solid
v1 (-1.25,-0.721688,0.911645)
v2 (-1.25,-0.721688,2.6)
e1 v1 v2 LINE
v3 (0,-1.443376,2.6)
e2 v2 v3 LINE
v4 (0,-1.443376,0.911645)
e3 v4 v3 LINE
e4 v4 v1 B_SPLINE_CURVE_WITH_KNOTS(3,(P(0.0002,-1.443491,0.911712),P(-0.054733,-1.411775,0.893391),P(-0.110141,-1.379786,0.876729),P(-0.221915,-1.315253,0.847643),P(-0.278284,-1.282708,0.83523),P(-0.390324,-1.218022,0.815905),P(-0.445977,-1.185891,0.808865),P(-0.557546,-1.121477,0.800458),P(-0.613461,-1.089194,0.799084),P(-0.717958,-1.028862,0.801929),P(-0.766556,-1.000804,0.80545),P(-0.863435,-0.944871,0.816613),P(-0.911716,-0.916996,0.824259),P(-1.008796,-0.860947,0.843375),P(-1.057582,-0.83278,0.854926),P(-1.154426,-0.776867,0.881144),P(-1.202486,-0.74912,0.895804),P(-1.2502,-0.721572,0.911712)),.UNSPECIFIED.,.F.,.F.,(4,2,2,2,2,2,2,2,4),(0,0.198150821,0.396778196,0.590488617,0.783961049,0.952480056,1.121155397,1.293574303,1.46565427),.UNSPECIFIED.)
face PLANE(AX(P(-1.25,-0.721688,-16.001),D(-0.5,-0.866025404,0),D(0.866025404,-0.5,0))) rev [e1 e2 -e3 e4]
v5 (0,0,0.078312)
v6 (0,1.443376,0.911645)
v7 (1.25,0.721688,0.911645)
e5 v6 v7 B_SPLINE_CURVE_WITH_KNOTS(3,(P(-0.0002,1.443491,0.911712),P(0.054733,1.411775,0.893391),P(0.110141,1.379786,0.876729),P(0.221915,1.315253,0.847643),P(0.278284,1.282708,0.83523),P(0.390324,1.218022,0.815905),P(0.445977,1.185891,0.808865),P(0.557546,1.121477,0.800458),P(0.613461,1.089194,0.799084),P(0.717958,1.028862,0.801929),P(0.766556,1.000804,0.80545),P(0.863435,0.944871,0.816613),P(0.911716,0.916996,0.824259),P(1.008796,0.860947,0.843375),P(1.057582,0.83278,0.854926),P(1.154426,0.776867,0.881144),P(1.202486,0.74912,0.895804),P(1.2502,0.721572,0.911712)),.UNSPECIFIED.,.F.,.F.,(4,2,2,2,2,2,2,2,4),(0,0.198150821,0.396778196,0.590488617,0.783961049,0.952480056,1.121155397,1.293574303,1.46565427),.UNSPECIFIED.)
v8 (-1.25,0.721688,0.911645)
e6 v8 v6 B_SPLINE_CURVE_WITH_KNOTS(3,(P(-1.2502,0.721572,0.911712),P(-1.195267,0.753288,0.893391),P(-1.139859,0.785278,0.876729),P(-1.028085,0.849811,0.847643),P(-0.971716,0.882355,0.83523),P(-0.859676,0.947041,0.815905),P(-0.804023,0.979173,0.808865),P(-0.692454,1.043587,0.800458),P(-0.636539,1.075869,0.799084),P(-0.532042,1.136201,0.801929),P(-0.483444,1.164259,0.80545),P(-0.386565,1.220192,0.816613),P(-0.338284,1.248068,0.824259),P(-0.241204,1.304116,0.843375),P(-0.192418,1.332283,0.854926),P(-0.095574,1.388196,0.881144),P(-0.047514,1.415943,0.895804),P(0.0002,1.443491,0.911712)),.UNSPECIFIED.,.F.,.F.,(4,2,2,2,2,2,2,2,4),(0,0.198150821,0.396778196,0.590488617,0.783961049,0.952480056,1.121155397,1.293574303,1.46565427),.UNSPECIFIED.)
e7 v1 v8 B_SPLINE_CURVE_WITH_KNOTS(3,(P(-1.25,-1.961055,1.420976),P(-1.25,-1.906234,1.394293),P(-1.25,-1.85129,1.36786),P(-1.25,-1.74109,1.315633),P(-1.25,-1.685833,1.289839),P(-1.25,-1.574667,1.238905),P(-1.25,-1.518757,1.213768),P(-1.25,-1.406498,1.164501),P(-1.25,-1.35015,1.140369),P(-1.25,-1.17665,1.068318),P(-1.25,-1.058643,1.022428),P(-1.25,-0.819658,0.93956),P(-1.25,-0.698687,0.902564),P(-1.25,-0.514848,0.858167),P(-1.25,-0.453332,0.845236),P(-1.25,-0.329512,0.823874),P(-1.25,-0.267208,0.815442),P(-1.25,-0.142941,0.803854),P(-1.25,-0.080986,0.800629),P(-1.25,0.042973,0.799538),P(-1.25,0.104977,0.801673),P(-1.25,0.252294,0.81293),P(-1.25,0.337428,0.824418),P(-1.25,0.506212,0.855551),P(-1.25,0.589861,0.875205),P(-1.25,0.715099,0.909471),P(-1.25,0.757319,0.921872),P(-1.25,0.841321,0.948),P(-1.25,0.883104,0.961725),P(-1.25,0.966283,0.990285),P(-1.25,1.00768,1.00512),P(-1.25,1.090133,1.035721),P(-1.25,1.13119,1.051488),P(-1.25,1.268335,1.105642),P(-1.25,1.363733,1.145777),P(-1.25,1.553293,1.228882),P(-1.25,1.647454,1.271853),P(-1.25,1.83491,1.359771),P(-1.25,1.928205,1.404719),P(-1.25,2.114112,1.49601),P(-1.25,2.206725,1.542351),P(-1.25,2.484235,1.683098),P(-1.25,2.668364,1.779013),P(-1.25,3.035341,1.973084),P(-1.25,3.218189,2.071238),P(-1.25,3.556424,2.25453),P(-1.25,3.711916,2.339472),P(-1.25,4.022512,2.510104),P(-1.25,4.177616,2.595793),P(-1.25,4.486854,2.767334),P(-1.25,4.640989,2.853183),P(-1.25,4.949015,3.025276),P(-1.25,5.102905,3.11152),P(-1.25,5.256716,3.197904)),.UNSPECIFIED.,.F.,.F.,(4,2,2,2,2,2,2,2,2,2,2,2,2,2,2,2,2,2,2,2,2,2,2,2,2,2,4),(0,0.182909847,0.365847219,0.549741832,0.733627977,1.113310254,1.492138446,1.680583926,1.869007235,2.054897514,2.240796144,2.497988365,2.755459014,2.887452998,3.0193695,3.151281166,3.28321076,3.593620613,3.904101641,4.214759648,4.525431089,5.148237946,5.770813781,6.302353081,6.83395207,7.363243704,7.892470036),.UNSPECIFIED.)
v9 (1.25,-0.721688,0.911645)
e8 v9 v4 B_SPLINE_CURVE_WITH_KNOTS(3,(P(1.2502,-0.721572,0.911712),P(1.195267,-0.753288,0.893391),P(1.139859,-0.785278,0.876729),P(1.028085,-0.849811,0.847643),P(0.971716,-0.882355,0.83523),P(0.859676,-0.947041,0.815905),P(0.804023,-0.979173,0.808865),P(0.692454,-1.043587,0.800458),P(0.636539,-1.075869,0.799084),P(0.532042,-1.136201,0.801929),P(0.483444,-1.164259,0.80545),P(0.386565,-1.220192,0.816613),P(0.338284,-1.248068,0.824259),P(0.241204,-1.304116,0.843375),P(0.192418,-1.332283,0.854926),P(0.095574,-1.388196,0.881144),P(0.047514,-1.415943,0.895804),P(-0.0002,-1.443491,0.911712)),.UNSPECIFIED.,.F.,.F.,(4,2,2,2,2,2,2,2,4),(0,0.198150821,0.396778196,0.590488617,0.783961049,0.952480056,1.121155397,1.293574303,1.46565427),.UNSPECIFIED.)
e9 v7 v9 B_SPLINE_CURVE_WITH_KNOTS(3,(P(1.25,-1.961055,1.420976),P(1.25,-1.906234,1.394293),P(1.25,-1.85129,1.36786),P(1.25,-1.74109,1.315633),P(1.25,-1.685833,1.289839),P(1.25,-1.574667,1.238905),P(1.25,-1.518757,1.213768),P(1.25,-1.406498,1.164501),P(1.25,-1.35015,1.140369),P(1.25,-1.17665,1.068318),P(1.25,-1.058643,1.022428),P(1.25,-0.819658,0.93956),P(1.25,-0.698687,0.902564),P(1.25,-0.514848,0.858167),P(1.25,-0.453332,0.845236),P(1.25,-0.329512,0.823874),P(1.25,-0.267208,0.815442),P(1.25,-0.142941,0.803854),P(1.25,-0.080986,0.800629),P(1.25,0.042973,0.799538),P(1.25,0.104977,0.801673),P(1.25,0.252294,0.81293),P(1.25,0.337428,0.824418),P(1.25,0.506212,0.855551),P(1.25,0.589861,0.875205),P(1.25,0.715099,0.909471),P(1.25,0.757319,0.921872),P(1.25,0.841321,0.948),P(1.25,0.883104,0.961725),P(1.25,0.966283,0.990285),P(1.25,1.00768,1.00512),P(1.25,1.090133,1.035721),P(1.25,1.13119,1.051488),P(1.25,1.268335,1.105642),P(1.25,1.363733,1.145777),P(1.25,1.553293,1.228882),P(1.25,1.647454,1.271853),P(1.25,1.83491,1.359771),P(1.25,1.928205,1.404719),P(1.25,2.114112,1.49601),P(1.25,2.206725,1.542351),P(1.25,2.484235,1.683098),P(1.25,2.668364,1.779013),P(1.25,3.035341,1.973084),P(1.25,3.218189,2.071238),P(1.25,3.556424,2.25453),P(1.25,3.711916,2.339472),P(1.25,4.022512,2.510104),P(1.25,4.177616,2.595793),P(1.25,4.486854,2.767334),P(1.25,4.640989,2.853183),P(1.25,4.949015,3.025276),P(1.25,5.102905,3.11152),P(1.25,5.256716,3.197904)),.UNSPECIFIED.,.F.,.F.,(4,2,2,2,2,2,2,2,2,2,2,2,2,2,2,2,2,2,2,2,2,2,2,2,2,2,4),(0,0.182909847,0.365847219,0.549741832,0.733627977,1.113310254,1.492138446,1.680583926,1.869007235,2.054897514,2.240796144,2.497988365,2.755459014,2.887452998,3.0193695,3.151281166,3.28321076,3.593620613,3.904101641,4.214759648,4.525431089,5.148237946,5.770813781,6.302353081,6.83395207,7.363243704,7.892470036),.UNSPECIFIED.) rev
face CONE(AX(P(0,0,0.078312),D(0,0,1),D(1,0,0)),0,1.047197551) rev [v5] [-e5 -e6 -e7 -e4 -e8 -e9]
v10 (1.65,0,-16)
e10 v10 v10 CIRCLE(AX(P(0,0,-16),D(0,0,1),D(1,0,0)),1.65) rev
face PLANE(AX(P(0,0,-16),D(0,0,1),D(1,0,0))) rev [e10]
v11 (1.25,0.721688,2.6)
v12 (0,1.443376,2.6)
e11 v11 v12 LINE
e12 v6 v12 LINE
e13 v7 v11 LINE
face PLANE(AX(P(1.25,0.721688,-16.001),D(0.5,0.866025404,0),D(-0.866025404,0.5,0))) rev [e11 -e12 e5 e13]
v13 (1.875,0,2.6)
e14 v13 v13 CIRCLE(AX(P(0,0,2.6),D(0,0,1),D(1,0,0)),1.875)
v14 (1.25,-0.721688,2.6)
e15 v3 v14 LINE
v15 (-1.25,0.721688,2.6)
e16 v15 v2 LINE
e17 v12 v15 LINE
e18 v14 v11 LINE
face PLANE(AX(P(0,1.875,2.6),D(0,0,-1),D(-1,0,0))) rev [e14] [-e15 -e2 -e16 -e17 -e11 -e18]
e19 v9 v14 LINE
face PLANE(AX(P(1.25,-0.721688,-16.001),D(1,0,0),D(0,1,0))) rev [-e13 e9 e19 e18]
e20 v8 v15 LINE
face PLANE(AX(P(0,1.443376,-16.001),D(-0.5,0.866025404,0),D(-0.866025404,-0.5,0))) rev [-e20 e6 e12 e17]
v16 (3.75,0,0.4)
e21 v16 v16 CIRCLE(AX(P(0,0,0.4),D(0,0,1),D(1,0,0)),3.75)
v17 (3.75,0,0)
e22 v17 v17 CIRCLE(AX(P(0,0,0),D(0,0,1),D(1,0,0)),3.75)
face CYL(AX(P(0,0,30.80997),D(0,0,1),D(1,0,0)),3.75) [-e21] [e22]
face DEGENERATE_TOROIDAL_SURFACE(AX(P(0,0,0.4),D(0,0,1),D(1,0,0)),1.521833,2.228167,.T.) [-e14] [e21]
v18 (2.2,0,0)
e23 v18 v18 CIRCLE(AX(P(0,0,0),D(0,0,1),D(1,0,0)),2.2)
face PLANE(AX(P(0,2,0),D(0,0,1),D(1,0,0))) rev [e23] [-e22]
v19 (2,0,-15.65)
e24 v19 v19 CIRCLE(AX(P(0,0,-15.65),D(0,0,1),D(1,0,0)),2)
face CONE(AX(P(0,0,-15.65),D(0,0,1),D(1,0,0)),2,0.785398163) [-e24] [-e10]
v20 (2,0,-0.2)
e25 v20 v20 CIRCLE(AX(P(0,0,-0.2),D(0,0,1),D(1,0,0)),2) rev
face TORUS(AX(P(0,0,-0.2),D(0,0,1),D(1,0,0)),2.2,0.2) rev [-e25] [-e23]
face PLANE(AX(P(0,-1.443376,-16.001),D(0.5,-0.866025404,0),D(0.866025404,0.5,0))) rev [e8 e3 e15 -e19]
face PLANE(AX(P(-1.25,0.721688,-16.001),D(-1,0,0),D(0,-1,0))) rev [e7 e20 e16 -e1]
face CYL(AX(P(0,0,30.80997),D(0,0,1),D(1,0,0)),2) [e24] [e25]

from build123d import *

# Parameters (mm, degrees)
CHAMFER1_SIZE      = 0.35
CUT_EXTRUDE1_START = -1.8000001
CUT_EXTRUDE1_DEPTH = 2.8000001
FILLET1_R          = 0.2


with BuildPart() as part:
    # Sketch1 → Revolve1 (revolve)
    with BuildSketch(Plane(origin=(0, 0, 0), x_dir=(0, 0, -1), z_dir=(1, 0, 0)), mode=Mode.PRIVATE) as revolve1_sk:
        with BuildLine():
            Line((16, 0), (16, 2))
            Line((16, 2), (0, 2))
            Line((0, 2), (0, 3.75))
            Line((0, 3.75), (-0.4, 3.75))
            ThreePointArc((-0.4, 3.75), (-1.845304899, 3.217657748), (-2.6, 1.875))
            Line((-2.6, 1.875), (-2.6, 0))
            Line((-2.6, 0), (16, 0))
        make_face()
    revolve(revolve1_sk.sketch.rotate(Axis((0, 0, 30.809969789), (0, 0, -1)), 90), axis=Axis((0, 0, 30.809969789), (0, 0, -1)))

    # Chamfer1
    chamfer1_edges = [part.edges().sort_by_distance(p)[0] for p in [
        (-2, 0, -16),
    ]]
    chamfer(chamfer1_edges, length=CHAMFER1_SIZE)

    # Sketch2 → Cut-Revolve1 (revolve, cut)
    with BuildSketch(Plane(origin=(0, 0, 0), x_dir=(0, 0, -1), z_dir=(1, 0, 0)), mode=Mode.PRIVATE) as cut_revolve1_sk:
        Polygon((-2.6, 0), (-2.6, 1.25), (-0.8, 1.25), (-0.078312164, 0), align=None)
    revolve(cut_revolve1_sk.sketch.rotate(Axis((0, 0, 2.452500839), (0, 0, -1)), 90), axis=Axis((0, 0, 2.452500839), (0, 0, -1)), mode=Mode.SUBTRACT)

    # Cut-Extrude1: read off the stored shape, not the designer's step
    # Cut-Extrude1 outline → Cut-Extrude1 (cut)
    with BuildSketch(Plane.XY.offset(2.6).offset(CUT_EXTRUDE1_START)):
        with BuildLine():
            Line((1.25, 0), (1.25, 0.721687836))
            Line((1.25, 0.721687836), (0.625, 1.082531755))
            ThreePointArc((0.625, 1.082531755), (1.082531755, 0.625), (1.25, 0))
        make_face()
        with BuildLine():
            ThreePointArc((-0.625, 1.082531755), (0, 1.25), (0.625, 1.082531755))
            Line((0.625, 1.082531755), (0, 1.443375673))
            Line((0, 1.443375673), (-0.625, 1.082531755))
        make_face()
        with BuildLine():
            Line((1.25, -0.721687836), (1.25, 0))
            ThreePointArc((1.25, 0), (1.082531755, -0.625), (0.625, -1.082531755))
            Line((0.625, -1.082531755), (1.25, -0.721687836))
        make_face()
        with BuildLine():
            ThreePointArc((-1.25, 0), (-1.082531755, 0.625), (-0.625, 1.082531755))
            Line((-0.625, 1.082531755), (-1.25, 0.721687836))
            Line((-1.25, 0.721687836), (-1.25, 0))
        make_face()
        with BuildLine():
            Line((0, -1.443375673), (0.625, -1.082531755))
            ThreePointArc((0.625, -1.082531755), (0, -1.25), (-0.625, -1.082531755))
            Line((-0.625, -1.082531755), (0, -1.443375673))
        make_face()
        with BuildLine():
            ThreePointArc((-0.625, -1.082531755), (-1.082531755, -0.625), (-1.25, 0))
            Line((-1.25, 0), (-1.25, -0.721687836))
            Line((-1.25, -0.721687836), (-0.625, -1.082531755))
        make_face()
    extrude(amount=CUT_EXTRUDE1_DEPTH, mode=Mode.SUBTRACT)

    # Cut-Extrude1 2 outline → Cut-Extrude1 2 (revolve)
    with BuildSketch(Plane.XZ):
        Polygon((1.443375738, 0.911645534), (1.249999957, 0.799999975), (1.443375673, 0.7999999), align=None)
    revolve(axis=Axis((0, 0, 0), (0, 0, 1)))

    # Fillet1
    fillet1_edges = [part.edges().sort_by_distance(p)[0] for p in [
        (-2, 0, 0),
    ]]
    fillet(fillet1_edges, radius=FILLET1_R)


solid = part.part
